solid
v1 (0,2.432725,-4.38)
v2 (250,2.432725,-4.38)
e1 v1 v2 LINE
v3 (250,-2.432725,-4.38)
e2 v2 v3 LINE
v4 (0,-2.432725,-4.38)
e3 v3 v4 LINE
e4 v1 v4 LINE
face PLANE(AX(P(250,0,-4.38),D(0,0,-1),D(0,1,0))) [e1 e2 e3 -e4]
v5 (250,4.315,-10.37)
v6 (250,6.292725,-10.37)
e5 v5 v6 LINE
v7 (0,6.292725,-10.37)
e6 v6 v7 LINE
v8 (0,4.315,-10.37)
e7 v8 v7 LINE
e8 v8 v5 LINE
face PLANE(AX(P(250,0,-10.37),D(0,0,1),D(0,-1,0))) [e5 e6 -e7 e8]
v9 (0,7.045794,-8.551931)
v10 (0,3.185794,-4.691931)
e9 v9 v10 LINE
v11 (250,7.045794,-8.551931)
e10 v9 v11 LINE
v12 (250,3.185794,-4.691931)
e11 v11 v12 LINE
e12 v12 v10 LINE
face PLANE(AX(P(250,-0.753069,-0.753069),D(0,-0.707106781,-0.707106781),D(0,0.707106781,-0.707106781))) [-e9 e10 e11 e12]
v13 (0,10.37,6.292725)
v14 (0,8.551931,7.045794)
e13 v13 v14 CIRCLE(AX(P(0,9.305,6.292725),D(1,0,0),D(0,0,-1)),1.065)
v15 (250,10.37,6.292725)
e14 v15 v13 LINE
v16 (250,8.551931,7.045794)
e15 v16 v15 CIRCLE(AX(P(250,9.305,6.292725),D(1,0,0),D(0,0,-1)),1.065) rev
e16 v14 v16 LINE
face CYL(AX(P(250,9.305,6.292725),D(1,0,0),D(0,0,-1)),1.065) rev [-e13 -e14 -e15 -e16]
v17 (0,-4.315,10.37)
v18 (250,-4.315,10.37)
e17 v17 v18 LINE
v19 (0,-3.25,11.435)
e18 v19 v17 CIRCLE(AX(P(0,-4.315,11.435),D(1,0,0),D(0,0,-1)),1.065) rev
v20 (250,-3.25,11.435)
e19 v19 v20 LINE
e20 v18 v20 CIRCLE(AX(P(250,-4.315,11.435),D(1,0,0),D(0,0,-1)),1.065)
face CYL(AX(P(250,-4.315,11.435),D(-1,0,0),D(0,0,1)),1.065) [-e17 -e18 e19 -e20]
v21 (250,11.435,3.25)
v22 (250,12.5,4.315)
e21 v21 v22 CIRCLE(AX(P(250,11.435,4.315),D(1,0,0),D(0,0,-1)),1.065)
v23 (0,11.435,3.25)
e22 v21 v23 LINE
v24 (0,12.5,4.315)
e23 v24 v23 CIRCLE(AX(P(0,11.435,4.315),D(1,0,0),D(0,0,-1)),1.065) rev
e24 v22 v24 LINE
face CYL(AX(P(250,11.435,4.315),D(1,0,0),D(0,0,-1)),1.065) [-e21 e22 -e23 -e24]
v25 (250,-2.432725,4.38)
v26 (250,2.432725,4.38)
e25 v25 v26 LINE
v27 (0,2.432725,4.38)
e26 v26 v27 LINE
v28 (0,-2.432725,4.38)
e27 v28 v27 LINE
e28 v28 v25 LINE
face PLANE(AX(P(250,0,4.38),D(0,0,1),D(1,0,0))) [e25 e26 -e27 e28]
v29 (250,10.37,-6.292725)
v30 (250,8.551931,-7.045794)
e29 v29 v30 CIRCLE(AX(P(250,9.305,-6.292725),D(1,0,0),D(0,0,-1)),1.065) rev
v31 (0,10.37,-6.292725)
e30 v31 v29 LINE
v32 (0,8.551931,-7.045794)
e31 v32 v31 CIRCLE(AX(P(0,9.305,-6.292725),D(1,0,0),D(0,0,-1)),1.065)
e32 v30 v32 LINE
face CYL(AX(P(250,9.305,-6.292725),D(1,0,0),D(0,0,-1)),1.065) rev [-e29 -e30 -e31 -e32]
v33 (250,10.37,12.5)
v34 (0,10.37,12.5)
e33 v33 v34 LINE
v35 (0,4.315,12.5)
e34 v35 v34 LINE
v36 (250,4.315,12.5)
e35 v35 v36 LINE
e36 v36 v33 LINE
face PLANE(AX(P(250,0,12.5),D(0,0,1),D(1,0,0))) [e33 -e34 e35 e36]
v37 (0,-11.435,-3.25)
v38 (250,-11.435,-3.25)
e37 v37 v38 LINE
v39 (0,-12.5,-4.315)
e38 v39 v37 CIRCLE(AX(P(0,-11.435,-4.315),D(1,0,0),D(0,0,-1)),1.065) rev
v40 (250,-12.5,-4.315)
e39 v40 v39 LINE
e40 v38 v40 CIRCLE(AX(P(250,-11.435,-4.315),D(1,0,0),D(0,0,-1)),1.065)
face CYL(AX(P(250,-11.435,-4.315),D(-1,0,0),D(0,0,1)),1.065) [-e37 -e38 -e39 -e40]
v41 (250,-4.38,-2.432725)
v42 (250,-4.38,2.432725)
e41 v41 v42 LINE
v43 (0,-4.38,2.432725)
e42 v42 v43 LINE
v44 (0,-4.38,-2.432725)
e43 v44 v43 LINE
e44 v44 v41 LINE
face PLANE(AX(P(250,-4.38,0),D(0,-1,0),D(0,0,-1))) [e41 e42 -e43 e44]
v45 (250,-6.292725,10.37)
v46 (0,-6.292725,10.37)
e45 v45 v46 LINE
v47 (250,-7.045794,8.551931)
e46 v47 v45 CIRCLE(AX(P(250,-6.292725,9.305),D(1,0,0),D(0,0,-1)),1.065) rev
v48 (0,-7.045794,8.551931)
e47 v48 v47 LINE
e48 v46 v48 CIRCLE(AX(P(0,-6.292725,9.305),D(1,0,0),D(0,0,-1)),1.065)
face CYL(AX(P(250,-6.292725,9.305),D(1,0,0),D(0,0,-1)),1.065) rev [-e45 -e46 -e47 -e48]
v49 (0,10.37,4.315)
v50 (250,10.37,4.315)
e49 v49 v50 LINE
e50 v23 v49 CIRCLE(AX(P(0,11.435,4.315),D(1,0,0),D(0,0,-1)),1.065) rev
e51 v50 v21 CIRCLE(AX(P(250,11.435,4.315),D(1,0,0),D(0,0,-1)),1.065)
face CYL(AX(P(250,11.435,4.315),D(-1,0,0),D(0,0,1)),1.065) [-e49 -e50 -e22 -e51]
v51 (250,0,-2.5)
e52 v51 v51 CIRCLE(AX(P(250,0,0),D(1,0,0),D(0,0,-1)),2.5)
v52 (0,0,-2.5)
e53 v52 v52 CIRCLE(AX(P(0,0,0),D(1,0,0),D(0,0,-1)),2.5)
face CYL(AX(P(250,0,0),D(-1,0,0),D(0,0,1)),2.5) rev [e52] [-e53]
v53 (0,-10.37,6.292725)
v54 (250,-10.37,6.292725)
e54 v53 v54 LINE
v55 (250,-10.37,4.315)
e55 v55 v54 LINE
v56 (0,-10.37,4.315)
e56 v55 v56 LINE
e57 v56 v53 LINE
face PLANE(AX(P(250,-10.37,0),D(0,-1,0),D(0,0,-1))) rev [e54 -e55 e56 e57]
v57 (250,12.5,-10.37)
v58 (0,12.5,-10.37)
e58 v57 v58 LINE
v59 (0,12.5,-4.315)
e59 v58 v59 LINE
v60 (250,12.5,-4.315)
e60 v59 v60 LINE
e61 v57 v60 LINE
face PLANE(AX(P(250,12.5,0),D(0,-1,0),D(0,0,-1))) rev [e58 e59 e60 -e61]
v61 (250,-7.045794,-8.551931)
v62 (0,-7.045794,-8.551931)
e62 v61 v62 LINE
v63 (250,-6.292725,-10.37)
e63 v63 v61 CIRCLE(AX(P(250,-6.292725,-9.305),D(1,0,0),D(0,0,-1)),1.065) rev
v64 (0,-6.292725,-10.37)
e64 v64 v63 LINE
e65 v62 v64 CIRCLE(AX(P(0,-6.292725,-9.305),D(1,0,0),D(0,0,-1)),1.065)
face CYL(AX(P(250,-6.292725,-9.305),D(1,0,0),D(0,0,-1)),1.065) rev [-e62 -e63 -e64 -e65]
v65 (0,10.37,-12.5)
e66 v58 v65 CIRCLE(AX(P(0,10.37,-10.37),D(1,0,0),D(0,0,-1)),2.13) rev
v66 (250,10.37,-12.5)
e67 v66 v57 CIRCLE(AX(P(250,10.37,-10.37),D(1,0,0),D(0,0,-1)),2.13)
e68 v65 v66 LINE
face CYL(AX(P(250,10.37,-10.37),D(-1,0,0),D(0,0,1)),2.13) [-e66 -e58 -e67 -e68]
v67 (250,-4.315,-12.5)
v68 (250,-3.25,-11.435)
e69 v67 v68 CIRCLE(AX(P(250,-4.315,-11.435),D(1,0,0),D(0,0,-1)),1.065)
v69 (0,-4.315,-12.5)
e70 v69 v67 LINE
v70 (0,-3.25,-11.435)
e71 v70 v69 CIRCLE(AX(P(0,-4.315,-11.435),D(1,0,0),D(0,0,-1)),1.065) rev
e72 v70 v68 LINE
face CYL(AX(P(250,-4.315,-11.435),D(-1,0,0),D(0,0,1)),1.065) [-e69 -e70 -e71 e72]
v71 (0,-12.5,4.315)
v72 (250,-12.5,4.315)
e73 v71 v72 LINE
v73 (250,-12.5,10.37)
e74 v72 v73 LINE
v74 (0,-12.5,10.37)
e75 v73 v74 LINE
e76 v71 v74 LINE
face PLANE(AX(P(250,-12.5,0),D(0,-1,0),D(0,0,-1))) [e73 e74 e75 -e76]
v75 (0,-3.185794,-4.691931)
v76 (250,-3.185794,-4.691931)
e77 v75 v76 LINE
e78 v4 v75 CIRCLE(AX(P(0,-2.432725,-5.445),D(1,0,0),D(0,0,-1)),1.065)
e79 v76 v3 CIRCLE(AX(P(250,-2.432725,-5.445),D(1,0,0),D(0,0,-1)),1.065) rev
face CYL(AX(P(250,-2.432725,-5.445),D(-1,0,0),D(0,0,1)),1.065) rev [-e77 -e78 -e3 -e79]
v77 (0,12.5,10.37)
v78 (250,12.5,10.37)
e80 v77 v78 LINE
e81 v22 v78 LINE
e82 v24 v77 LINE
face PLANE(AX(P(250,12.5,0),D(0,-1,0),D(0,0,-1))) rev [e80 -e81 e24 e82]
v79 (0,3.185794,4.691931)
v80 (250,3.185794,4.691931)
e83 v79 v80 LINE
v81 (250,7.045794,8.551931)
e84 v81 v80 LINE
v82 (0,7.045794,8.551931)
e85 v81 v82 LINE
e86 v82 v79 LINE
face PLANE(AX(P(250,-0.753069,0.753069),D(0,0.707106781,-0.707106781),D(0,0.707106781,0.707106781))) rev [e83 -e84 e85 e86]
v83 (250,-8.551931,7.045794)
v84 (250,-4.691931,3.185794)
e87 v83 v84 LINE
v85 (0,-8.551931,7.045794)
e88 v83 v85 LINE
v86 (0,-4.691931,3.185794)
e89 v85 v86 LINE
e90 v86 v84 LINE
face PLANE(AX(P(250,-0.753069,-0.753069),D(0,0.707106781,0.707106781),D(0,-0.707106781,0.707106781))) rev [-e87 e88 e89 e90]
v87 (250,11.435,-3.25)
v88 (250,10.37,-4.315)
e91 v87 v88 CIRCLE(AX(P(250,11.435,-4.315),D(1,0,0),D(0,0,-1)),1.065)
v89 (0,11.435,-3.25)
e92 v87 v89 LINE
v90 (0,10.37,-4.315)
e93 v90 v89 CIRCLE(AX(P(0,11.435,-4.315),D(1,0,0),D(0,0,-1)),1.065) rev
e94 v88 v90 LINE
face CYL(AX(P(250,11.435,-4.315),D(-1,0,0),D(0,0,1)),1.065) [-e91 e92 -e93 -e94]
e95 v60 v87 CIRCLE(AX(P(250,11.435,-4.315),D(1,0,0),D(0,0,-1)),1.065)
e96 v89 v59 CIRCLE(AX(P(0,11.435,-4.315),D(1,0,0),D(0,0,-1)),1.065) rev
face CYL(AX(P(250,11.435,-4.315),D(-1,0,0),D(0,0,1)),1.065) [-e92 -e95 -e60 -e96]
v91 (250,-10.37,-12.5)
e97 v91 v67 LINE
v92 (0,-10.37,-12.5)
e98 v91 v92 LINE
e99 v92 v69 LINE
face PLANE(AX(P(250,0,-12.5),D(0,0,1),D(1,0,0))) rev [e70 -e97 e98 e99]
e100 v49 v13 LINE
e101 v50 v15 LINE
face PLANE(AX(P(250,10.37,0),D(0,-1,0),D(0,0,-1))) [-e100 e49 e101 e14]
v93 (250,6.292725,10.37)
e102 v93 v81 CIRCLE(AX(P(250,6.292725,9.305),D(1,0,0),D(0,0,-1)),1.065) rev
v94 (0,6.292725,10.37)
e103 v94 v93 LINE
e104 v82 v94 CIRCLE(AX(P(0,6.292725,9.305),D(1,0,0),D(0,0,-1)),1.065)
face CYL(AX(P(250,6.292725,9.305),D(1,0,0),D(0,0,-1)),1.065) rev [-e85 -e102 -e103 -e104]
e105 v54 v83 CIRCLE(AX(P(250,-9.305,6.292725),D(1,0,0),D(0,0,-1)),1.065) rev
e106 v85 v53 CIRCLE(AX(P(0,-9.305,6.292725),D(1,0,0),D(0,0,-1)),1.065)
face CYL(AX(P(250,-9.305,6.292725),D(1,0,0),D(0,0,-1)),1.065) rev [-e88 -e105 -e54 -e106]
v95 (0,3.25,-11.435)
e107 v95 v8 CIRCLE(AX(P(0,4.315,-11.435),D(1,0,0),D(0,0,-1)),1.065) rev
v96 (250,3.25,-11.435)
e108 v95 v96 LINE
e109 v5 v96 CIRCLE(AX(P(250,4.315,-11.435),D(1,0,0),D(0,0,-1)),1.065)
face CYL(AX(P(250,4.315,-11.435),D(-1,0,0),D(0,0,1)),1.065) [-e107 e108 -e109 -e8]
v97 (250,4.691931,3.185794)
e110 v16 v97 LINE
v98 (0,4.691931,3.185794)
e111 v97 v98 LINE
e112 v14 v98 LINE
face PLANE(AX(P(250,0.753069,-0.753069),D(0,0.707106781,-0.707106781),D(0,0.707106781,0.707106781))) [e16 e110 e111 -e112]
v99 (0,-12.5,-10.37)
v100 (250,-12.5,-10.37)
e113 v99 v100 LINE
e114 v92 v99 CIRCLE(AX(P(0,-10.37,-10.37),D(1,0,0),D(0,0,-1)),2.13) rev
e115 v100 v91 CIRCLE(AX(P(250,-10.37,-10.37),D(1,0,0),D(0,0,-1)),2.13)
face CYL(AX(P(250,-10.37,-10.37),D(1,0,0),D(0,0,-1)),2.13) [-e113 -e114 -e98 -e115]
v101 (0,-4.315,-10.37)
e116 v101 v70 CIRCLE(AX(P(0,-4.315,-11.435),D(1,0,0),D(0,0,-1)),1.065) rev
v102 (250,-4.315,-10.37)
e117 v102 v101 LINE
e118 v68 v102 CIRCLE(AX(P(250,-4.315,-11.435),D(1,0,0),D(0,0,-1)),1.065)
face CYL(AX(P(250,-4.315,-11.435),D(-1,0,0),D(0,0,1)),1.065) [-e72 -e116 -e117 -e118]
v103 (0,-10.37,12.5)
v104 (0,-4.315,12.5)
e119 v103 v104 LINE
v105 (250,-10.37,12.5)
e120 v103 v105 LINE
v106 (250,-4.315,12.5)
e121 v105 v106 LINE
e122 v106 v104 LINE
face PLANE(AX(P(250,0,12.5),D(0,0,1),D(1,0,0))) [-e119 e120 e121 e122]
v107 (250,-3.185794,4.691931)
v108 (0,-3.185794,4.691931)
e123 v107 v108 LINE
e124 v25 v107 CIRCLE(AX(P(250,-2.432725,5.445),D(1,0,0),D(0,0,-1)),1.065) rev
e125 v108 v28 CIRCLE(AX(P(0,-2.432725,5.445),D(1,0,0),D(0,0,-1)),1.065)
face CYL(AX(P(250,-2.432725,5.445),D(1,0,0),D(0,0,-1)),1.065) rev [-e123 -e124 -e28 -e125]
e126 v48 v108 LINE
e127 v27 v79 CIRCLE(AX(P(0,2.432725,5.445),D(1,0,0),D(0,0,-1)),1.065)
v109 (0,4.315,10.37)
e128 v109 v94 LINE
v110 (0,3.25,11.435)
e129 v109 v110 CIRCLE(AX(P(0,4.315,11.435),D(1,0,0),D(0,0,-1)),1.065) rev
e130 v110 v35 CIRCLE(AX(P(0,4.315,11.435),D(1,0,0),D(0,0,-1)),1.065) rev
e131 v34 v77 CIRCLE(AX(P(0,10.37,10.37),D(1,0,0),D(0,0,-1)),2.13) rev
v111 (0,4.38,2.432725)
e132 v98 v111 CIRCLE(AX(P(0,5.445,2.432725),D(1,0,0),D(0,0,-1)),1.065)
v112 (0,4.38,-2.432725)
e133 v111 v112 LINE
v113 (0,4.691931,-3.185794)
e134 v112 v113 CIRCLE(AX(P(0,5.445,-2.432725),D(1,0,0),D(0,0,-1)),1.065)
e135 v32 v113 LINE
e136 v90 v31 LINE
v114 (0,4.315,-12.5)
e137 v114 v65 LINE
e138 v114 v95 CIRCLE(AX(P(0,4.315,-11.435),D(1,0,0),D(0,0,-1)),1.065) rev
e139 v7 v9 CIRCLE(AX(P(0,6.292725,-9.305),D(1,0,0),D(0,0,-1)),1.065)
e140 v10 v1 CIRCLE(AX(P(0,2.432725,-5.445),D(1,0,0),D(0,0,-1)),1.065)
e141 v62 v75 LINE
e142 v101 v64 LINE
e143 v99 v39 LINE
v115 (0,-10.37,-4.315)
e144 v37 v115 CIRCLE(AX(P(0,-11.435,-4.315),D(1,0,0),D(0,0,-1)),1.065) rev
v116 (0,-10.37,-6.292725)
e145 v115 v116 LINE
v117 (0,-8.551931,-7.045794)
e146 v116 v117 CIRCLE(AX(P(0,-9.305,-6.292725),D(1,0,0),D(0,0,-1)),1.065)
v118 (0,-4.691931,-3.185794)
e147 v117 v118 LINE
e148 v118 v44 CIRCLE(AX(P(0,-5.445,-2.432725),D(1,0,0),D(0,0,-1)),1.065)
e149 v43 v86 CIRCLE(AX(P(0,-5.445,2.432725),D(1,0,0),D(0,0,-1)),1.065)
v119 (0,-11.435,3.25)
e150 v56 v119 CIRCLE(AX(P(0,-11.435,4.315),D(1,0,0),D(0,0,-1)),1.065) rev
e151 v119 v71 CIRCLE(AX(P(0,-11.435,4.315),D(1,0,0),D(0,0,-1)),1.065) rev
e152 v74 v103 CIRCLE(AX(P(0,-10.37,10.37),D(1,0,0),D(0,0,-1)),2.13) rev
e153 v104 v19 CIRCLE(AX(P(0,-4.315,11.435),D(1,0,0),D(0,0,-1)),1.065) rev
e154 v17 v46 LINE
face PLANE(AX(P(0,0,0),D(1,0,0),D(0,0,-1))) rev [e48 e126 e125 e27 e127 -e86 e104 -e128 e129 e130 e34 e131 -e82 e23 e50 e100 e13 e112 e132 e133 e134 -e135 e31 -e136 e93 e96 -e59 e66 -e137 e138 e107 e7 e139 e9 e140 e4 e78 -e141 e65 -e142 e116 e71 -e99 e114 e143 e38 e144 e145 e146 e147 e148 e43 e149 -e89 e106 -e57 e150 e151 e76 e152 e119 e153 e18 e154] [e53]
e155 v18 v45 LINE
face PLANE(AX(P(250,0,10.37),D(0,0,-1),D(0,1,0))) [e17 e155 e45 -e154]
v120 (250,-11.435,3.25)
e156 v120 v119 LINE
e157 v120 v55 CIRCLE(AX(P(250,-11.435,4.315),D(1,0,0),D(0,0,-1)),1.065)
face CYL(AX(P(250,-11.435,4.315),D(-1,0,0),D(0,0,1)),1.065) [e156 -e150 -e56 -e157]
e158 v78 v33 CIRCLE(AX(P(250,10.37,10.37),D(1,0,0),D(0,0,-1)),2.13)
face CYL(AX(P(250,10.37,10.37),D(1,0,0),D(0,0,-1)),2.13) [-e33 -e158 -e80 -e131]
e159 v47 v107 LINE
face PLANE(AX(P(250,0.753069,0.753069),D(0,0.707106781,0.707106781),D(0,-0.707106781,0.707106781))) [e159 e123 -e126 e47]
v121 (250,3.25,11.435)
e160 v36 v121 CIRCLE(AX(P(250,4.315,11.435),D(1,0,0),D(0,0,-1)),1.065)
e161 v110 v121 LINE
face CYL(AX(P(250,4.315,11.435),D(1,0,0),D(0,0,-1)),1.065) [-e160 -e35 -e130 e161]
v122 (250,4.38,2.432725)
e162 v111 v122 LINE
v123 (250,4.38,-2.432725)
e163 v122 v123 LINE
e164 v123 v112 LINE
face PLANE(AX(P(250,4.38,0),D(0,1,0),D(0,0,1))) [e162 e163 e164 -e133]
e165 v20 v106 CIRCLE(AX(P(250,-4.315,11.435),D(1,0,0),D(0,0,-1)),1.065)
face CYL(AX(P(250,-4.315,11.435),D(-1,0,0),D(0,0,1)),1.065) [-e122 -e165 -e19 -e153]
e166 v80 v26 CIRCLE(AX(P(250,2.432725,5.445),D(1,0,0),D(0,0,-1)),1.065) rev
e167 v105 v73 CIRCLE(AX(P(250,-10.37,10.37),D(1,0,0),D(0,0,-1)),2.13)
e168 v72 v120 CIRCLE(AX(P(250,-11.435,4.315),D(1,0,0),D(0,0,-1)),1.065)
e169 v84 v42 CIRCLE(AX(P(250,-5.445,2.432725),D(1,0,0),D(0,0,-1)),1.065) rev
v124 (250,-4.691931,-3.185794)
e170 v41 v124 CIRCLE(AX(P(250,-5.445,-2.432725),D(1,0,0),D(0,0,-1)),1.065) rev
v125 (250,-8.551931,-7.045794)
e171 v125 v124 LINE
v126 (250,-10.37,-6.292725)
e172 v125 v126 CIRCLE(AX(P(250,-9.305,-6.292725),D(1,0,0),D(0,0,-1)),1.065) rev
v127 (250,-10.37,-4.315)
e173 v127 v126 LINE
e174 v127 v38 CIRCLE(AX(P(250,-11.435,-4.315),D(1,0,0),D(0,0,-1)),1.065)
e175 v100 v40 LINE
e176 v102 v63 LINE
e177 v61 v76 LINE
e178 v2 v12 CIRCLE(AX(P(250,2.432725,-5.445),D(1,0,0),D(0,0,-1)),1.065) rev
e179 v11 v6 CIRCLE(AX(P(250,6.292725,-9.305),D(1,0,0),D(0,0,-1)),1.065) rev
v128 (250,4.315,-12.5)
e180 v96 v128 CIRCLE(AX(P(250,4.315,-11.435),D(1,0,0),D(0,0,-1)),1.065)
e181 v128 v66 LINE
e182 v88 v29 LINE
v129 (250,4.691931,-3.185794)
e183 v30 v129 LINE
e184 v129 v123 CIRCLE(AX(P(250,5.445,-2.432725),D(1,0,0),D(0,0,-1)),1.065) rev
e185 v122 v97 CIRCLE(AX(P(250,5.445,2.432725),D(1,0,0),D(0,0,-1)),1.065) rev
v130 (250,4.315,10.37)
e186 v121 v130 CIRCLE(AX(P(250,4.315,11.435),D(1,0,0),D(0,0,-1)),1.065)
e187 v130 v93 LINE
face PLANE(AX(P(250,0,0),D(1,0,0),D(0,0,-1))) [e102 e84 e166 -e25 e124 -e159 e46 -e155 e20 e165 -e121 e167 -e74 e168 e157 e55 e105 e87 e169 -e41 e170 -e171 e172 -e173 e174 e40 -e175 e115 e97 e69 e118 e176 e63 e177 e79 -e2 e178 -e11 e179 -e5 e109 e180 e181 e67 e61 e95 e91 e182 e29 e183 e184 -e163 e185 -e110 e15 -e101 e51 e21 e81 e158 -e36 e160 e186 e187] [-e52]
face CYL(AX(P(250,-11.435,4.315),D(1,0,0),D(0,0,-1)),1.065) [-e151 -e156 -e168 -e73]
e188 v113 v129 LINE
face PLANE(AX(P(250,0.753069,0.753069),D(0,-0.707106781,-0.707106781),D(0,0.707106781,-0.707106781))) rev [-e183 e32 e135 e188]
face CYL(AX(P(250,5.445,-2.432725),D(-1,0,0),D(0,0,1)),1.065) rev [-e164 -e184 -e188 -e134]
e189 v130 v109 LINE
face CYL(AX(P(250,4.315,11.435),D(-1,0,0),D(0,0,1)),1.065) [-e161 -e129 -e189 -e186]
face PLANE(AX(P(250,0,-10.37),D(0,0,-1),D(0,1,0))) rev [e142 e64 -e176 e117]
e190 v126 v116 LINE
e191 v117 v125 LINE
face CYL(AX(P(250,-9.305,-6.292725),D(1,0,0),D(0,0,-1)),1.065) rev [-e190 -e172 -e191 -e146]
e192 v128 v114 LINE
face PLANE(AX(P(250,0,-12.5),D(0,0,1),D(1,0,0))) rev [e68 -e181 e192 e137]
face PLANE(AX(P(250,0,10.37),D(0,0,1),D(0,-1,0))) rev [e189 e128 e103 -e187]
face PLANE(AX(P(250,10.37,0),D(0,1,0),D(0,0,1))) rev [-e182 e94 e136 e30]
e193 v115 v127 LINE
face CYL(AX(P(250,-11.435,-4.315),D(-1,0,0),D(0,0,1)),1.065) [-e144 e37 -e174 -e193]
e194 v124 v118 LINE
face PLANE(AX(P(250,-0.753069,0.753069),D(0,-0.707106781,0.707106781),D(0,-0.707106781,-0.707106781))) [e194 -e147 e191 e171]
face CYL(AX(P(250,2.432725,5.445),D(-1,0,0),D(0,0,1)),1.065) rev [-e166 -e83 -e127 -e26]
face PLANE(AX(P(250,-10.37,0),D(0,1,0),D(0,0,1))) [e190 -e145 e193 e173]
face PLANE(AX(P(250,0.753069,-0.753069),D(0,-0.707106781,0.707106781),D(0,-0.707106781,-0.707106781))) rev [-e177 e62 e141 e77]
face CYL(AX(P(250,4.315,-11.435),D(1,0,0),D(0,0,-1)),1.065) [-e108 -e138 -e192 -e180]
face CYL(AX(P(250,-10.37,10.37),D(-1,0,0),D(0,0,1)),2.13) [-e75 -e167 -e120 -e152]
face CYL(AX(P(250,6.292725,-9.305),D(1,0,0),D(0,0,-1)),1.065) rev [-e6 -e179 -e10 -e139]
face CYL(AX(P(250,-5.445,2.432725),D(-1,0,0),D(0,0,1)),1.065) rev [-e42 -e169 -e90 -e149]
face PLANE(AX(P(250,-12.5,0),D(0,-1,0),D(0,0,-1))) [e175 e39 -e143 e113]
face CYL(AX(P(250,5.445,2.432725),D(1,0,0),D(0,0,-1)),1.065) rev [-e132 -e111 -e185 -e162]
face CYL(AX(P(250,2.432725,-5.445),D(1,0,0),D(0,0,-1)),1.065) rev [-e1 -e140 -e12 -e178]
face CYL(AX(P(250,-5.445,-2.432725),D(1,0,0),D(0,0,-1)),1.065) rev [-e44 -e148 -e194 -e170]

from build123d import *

# Parameters (mm, degrees)
SKETCH1_R           = 2.5
BOSS_EXTRUDE1_DEPTH = 250
FILLET1_R           = 1.065
FILLET2_R           = 2.13


with BuildPart() as part:
    # Sketch1 → Boss-Extrude1 (new body)
    with BuildSketch(Plane.YZ):
        Polygon((-12.5, -3.25), (-12.5, -12.5), (-3.25, -12.5), (-3.25, -10.37), (-8.863862556, -10.37), (-2.873862556, -4.38), (2.873862556, -4.38), (8.863862556, -10.37), (3.25, -10.37), (3.25, -12.5), (12.5, -12.5), (12.5, -3.25), (10.37, -3.25), (10.37, -8.863862556), (4.38, -2.873862556), (4.38, 2.873862556), (10.37, 8.863862556), (10.37, 3.25), (12.5, 3.25), (12.5, 12.5), (3.25, 12.5), (3.25, 10.37), (8.863862556, 10.37), (2.873862556, 4.38), (-2.873862556, 4.38), (-8.863862556, 10.37), (-3.25, 10.37), (-3.25, 12.5), (-12.5, 12.5), (-12.5, 3.25), (-10.37, 3.25), (-10.37, 8.863862556), (-4.38, 2.873862556), (-4.38, -2.873862556), (-10.37, -8.863862556), (-10.37, -3.25), align=None)
        with Locations(Location((0, 0, 0), (0, 0, 270))):
            Circle(SKETCH1_R, mode=Mode.SUBTRACT)
    extrude(amount=BOSS_EXTRUDE1_DEPTH)

    # Fillet1
    fillet1_edges = [part.edges().sort_by_distance(p)[0] for p in [
        (125, -10.37, -8.863862556),
        (125, 2.873862556, -4.38),
        (125, -2.873862556, -4.38),
        (125, -4.38, 2.873862556),
        (125, -4.38, -2.873862556),
        (125, -2.873862556, 4.38),
        (125, 2.873862556, 4.38),
        (125, 4.38, 2.873862556),
        (125, 4.38, -2.873862556),
        (125, -8.863862556, -10.37),
        (125, 8.863862556, -10.37),
        (125, 10.37, -8.863862556),
        (125, -10.37, 8.863862556),
        (125, -8.863862556, 10.37),
        (125, 10.37, 8.863862556),
        (125, 8.863862556, 10.37),
        (125, 12.5, 3.25),
        (125, -3.25, -12.5),
        (125, -10.37, 3.25),
        (125, 10.37, 3.25),
        (125, -10.37, -3.25),
        (125, -12.5, -3.25),
        (125, -12.5, 3.25),
        (125, 3.25, -10.37),
        (125, -3.25, -10.37),
        (125, 3.25, -12.5),
        (125, 10.37, -3.25),
        (125, 12.5, -3.25),
        (125, 3.25, 12.5),
        (125, 3.25, 10.37),
        (125, -3.25, 10.37),
        (125, -3.25, 12.5),
    ]]
    fillet(fillet1_edges, radius=FILLET1_R - 0.0001)  # a hair under: the kernel refuses the full size

    # Fillet2
    fillet2_edges = [part.edges().sort_by_distance(p)[0] for p in [
        (125, -12.5, 12.5),
        (125, 12.5, 12.5),
        (125, 12.5, -12.5),
        (125, -12.5, -12.5),
    ]]
    fillet(fillet2_edges, radius=FILLET2_R)


solid = part.part
